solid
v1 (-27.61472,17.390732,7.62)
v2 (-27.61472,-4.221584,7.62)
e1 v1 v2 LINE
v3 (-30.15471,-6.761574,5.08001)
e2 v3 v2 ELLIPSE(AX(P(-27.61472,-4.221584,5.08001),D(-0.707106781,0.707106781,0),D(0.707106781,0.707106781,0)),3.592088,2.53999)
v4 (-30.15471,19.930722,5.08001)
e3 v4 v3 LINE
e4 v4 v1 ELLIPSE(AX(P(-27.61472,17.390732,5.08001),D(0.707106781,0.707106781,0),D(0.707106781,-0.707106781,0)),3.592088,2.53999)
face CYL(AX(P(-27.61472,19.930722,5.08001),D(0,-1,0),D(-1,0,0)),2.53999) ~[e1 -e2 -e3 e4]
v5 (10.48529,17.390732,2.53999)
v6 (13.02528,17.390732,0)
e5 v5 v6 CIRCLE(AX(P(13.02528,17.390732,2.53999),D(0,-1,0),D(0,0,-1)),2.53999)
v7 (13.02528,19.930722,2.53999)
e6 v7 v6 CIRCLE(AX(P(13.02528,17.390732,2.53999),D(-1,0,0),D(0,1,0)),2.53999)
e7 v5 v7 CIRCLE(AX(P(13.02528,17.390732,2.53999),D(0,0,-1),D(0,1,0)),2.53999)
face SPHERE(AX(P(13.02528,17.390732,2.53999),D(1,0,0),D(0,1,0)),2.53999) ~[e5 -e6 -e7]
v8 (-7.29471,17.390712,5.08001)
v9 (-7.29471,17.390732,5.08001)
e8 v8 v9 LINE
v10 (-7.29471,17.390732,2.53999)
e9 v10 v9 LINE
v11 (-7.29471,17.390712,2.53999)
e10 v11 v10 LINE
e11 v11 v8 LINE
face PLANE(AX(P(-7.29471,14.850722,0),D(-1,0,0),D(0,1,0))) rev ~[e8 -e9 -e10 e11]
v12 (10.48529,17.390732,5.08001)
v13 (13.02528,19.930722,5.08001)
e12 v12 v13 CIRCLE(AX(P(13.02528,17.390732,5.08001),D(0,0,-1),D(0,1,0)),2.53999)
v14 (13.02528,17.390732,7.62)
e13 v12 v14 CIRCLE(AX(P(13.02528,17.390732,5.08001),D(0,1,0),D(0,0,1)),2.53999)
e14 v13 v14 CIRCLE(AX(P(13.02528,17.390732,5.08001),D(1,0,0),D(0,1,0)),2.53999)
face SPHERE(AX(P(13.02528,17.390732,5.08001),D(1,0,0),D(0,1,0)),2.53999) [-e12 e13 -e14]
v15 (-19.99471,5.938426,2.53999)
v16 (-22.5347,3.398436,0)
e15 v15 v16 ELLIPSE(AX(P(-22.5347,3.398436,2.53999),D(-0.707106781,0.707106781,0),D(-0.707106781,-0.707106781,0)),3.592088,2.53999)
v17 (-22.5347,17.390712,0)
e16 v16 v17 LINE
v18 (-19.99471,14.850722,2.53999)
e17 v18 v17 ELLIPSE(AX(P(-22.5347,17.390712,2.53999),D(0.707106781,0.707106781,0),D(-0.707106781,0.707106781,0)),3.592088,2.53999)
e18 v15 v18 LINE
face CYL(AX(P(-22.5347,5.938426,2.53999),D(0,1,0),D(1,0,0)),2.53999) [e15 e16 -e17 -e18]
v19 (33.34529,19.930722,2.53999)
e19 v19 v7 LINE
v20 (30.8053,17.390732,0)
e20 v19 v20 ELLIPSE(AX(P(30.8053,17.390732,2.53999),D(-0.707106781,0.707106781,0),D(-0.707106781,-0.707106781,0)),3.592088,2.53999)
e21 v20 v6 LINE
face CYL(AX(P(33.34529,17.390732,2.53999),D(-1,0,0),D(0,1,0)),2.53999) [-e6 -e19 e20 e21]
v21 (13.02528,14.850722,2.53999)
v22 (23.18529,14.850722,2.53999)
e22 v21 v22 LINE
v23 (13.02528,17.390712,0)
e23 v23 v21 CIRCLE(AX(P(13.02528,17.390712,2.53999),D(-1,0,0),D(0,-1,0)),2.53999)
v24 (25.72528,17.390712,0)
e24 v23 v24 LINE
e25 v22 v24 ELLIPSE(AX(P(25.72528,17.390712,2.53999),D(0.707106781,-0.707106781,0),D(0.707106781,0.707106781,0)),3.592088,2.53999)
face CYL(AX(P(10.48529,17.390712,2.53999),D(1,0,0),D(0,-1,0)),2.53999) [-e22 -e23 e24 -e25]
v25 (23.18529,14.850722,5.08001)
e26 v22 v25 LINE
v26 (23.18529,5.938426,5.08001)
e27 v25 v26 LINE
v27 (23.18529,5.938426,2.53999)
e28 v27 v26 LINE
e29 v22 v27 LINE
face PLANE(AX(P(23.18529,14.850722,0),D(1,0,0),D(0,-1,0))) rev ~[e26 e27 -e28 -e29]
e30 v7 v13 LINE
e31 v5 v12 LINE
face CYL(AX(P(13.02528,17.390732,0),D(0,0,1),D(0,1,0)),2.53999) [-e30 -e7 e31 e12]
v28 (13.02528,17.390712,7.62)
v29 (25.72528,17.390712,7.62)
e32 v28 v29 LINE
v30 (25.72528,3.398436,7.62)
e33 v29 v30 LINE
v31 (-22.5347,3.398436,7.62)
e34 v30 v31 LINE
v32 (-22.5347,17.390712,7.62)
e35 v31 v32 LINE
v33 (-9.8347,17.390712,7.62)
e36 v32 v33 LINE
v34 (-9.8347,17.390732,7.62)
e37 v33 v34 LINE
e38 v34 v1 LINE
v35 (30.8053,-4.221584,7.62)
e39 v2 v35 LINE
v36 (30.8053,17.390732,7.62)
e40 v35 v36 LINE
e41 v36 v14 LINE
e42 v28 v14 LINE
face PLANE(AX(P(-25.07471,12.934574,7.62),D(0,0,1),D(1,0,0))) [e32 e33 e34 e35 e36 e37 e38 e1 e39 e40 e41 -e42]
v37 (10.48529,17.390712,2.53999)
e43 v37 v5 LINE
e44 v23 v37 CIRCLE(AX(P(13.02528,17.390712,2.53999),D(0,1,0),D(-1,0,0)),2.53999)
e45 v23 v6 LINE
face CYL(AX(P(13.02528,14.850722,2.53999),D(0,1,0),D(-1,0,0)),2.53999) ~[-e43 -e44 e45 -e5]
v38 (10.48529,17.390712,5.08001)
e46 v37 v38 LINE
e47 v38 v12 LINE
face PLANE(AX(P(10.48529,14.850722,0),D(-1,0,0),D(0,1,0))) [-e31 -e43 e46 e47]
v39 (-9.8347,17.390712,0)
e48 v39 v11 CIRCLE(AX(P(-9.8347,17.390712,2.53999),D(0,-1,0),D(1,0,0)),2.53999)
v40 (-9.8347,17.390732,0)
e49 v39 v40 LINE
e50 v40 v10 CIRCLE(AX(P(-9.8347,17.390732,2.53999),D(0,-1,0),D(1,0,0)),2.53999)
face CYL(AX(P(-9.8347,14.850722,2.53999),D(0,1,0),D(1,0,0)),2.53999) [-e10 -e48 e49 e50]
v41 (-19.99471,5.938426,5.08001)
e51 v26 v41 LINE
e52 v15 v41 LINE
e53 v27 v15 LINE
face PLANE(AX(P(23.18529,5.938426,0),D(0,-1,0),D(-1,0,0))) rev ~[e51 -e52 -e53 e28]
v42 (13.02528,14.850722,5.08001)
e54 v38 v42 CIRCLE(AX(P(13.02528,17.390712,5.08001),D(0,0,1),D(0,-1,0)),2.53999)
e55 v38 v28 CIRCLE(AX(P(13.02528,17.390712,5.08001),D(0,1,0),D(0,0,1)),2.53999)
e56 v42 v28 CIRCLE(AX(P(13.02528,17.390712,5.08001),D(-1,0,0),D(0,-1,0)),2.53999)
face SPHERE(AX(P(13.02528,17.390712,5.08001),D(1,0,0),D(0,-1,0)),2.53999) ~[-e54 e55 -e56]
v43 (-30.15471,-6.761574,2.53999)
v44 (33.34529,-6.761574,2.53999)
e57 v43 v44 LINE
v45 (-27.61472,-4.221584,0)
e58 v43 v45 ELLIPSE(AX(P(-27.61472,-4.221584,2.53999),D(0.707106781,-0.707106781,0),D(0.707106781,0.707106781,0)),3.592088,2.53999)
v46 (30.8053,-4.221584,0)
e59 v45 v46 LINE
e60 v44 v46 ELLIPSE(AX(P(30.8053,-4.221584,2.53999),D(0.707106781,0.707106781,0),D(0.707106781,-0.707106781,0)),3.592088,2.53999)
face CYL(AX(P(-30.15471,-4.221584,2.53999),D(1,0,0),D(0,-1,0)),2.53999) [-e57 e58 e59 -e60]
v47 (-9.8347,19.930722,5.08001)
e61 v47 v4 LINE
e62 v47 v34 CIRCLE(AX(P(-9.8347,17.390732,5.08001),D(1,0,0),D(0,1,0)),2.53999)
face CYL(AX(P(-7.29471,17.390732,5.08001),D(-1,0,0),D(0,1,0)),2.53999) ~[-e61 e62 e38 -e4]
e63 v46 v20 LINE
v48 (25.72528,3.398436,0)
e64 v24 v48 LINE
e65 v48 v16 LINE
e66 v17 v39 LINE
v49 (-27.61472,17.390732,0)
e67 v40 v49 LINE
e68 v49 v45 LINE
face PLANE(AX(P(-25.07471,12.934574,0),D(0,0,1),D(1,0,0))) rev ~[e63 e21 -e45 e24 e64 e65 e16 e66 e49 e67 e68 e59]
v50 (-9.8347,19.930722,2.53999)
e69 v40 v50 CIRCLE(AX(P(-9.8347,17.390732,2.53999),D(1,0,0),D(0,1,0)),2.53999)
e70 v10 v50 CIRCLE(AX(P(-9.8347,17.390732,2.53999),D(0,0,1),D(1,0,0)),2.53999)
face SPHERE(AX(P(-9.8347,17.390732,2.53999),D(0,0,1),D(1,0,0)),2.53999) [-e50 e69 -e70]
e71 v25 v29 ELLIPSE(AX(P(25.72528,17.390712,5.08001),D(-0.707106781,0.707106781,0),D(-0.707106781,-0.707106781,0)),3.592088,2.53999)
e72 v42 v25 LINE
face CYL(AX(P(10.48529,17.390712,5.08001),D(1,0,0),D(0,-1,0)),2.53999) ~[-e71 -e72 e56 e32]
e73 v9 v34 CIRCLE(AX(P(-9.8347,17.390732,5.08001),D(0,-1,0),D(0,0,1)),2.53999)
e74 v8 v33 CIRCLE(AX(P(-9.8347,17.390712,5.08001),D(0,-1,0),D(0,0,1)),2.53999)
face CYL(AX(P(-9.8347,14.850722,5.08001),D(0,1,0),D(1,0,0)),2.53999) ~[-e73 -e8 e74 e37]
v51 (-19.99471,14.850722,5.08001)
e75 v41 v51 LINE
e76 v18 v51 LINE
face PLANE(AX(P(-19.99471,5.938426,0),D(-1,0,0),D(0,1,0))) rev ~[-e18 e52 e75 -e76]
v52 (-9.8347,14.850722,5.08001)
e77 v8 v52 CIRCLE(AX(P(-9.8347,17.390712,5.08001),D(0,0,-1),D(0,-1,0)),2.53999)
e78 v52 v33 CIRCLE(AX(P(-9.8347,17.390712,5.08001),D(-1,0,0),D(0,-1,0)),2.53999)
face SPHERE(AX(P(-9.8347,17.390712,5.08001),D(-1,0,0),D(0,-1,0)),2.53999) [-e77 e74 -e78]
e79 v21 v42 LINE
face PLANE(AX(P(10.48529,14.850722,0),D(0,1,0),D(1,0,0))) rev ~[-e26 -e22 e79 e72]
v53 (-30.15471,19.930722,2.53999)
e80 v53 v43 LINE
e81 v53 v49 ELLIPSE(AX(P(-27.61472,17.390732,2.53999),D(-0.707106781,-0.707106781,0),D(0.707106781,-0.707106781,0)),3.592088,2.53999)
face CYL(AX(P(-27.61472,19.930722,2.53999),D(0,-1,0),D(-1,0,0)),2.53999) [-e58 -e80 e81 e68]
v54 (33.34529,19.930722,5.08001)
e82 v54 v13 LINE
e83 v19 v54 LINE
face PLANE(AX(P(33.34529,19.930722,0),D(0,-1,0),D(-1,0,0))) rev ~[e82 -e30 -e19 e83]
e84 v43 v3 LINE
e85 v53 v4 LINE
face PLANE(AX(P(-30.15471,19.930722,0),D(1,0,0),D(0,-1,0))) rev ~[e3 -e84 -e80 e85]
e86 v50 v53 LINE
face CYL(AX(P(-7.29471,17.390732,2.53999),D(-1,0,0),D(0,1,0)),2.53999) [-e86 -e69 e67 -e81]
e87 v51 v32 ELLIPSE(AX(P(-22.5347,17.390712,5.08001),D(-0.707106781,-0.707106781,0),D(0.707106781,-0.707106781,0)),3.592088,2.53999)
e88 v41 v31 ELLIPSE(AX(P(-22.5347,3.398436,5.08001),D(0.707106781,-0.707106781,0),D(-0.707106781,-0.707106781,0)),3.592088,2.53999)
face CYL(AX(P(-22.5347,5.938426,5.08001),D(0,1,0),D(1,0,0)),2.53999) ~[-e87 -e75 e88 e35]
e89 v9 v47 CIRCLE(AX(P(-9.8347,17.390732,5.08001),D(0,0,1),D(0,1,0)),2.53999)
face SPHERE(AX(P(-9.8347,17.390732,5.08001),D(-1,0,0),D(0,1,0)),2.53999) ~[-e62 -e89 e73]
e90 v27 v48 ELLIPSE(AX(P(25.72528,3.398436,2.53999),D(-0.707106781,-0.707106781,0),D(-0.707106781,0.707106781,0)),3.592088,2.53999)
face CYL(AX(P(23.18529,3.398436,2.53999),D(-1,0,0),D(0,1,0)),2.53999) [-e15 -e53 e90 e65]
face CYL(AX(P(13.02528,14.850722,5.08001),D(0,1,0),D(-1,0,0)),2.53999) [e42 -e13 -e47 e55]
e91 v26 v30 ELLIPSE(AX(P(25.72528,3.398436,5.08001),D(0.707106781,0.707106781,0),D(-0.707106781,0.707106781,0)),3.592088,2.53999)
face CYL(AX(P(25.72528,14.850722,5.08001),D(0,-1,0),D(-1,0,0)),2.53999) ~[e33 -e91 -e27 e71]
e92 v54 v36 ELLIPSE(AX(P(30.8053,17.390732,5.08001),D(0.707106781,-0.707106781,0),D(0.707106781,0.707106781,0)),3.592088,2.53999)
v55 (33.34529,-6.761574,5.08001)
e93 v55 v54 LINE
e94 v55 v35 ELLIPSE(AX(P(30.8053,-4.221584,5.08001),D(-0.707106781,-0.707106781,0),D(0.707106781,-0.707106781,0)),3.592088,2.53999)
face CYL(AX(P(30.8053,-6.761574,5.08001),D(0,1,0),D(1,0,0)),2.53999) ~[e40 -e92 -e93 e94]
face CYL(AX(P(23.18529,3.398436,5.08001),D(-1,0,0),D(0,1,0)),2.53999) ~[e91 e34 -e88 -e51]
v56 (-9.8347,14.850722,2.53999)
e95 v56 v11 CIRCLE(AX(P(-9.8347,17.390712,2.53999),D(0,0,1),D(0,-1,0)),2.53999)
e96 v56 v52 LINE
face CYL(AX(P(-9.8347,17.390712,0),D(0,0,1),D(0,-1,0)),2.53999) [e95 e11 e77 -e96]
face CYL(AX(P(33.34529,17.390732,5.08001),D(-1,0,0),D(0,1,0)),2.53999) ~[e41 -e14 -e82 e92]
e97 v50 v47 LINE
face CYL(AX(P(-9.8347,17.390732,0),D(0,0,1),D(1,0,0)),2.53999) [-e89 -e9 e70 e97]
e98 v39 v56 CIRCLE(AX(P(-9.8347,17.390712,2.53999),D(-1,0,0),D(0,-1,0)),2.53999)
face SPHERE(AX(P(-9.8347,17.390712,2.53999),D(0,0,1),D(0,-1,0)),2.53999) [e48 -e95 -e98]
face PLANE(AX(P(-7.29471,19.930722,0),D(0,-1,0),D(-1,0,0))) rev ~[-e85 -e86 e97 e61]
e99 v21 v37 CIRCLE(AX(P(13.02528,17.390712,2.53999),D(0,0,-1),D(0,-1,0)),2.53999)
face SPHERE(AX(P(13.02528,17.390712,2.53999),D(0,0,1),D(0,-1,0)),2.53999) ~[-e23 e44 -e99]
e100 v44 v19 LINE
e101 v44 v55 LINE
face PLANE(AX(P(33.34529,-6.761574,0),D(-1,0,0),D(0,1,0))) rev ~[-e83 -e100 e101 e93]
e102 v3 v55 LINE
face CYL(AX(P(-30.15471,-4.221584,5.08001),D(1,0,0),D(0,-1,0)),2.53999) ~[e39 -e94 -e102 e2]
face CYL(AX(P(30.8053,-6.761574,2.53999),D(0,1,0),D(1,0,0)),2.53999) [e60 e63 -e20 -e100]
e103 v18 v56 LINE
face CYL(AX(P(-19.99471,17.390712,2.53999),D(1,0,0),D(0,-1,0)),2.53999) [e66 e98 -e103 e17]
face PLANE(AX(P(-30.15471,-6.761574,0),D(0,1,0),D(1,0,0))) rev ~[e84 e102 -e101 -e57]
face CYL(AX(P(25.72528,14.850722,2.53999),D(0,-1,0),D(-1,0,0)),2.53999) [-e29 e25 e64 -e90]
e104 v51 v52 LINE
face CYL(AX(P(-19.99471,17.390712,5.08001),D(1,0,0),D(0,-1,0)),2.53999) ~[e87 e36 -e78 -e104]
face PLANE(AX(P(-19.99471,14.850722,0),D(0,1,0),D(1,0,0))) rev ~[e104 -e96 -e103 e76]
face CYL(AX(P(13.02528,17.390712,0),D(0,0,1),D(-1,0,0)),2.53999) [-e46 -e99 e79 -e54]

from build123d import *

# Parameters (mm, degrees)
F0_W     = 12.7
F0_H     = 5.08
F1_DEPTH = 7.62
F2_R     = 2.53999


# Not quite as in the source:
# - a fillet or chamfer is up to 0.001 mm smaller than in the source, because OpenCascade refuses the exact size


with BuildPart() as f1:
    # F0 (on Top) → F1 (new body)
    with BuildSketch(Plane.XY):
        Polygon((-30.1547096223, 19.9307221919), (-30.1547096223, 5.9384261601), (-19.9947096223, 5.9384261601), (-19.9947096223, 14.8507221919), (-19.9947096223, 19.9307221919), align=None)
        Polygon((-19.9947096223, 5.9384261601), (-30.1547096223, 5.9384261601), (-30.1547096223, -6.7615738399), (33.3452903777, -6.7615738399), (33.3452903777, 5.9384261601), (23.1852903777, 5.9384261601), align=None)
        Polygon((23.1852903777, 14.8507221919), (23.1852903777, 5.9384261601), (33.3452903777, 5.9384261601), (33.3452903777, 19.9307221919), (23.1852903777, 19.9307221919), align=None)
        with Locations((-13.6447096223, 17.3907221919)):
            Rectangle(F0_W, F0_H)
        with Locations((16.8352903777, 17.3907221919)):
            Rectangle(F0_W, F0_H)
    extrude(amount=F1_DEPTH)

    # F2 (radius 2.54 in the source; OpenCascade refuses exactly that, so slightly less here)
    f2_edges = [f1.edges().sort_by_distance(p)[0] for p in [
        (1.59529, -6.761574, 7.62),
        (1.59529, 5.938426, 7.62),
        (-30.15471, 6.584574, 7.62),
        (33.34529, 6.584574, 7.62),
        (21.91529, 19.930722, 7.62),
        (-18.72471, 19.930722, 7.62),
        (21.91529, 19.930722, 0),
        (23.18529, 10.394574, 7.62),
        (16.83529, 14.850722, 7.62),
        (-13.64471, 14.850722, 7.62),
        (1.59529, -6.761574, 0),
        (-30.15471, 6.584574, 0),
        (33.34529, 6.584574, 0),
        (10.48529, 14.850722, 3.81),
        (10.48529, 19.930722, 3.81),
        (-7.29471, 14.850722, 3.81),
        (-7.29471, 19.930722, 3.81),
        (-19.99471, 10.394574, 7.62),
        (1.59529, 5.938426, 0),
        (-19.99471, 10.394574, 0),
        (16.83529, 14.850722, 0),
        (23.18529, 10.394574, 0),
        (-13.64471, 14.850722, 0),
        (10.48529, 17.390722, 0),
        (-7.29471, 17.390722, 0),
        (-18.72471, 19.930722, 0),
        (10.48529, 17.390722, 7.62),
        (-7.29471, 17.390722, 7.62),
    ]]
    fillet(f2_edges, radius=F2_R)


solid = f1.part
